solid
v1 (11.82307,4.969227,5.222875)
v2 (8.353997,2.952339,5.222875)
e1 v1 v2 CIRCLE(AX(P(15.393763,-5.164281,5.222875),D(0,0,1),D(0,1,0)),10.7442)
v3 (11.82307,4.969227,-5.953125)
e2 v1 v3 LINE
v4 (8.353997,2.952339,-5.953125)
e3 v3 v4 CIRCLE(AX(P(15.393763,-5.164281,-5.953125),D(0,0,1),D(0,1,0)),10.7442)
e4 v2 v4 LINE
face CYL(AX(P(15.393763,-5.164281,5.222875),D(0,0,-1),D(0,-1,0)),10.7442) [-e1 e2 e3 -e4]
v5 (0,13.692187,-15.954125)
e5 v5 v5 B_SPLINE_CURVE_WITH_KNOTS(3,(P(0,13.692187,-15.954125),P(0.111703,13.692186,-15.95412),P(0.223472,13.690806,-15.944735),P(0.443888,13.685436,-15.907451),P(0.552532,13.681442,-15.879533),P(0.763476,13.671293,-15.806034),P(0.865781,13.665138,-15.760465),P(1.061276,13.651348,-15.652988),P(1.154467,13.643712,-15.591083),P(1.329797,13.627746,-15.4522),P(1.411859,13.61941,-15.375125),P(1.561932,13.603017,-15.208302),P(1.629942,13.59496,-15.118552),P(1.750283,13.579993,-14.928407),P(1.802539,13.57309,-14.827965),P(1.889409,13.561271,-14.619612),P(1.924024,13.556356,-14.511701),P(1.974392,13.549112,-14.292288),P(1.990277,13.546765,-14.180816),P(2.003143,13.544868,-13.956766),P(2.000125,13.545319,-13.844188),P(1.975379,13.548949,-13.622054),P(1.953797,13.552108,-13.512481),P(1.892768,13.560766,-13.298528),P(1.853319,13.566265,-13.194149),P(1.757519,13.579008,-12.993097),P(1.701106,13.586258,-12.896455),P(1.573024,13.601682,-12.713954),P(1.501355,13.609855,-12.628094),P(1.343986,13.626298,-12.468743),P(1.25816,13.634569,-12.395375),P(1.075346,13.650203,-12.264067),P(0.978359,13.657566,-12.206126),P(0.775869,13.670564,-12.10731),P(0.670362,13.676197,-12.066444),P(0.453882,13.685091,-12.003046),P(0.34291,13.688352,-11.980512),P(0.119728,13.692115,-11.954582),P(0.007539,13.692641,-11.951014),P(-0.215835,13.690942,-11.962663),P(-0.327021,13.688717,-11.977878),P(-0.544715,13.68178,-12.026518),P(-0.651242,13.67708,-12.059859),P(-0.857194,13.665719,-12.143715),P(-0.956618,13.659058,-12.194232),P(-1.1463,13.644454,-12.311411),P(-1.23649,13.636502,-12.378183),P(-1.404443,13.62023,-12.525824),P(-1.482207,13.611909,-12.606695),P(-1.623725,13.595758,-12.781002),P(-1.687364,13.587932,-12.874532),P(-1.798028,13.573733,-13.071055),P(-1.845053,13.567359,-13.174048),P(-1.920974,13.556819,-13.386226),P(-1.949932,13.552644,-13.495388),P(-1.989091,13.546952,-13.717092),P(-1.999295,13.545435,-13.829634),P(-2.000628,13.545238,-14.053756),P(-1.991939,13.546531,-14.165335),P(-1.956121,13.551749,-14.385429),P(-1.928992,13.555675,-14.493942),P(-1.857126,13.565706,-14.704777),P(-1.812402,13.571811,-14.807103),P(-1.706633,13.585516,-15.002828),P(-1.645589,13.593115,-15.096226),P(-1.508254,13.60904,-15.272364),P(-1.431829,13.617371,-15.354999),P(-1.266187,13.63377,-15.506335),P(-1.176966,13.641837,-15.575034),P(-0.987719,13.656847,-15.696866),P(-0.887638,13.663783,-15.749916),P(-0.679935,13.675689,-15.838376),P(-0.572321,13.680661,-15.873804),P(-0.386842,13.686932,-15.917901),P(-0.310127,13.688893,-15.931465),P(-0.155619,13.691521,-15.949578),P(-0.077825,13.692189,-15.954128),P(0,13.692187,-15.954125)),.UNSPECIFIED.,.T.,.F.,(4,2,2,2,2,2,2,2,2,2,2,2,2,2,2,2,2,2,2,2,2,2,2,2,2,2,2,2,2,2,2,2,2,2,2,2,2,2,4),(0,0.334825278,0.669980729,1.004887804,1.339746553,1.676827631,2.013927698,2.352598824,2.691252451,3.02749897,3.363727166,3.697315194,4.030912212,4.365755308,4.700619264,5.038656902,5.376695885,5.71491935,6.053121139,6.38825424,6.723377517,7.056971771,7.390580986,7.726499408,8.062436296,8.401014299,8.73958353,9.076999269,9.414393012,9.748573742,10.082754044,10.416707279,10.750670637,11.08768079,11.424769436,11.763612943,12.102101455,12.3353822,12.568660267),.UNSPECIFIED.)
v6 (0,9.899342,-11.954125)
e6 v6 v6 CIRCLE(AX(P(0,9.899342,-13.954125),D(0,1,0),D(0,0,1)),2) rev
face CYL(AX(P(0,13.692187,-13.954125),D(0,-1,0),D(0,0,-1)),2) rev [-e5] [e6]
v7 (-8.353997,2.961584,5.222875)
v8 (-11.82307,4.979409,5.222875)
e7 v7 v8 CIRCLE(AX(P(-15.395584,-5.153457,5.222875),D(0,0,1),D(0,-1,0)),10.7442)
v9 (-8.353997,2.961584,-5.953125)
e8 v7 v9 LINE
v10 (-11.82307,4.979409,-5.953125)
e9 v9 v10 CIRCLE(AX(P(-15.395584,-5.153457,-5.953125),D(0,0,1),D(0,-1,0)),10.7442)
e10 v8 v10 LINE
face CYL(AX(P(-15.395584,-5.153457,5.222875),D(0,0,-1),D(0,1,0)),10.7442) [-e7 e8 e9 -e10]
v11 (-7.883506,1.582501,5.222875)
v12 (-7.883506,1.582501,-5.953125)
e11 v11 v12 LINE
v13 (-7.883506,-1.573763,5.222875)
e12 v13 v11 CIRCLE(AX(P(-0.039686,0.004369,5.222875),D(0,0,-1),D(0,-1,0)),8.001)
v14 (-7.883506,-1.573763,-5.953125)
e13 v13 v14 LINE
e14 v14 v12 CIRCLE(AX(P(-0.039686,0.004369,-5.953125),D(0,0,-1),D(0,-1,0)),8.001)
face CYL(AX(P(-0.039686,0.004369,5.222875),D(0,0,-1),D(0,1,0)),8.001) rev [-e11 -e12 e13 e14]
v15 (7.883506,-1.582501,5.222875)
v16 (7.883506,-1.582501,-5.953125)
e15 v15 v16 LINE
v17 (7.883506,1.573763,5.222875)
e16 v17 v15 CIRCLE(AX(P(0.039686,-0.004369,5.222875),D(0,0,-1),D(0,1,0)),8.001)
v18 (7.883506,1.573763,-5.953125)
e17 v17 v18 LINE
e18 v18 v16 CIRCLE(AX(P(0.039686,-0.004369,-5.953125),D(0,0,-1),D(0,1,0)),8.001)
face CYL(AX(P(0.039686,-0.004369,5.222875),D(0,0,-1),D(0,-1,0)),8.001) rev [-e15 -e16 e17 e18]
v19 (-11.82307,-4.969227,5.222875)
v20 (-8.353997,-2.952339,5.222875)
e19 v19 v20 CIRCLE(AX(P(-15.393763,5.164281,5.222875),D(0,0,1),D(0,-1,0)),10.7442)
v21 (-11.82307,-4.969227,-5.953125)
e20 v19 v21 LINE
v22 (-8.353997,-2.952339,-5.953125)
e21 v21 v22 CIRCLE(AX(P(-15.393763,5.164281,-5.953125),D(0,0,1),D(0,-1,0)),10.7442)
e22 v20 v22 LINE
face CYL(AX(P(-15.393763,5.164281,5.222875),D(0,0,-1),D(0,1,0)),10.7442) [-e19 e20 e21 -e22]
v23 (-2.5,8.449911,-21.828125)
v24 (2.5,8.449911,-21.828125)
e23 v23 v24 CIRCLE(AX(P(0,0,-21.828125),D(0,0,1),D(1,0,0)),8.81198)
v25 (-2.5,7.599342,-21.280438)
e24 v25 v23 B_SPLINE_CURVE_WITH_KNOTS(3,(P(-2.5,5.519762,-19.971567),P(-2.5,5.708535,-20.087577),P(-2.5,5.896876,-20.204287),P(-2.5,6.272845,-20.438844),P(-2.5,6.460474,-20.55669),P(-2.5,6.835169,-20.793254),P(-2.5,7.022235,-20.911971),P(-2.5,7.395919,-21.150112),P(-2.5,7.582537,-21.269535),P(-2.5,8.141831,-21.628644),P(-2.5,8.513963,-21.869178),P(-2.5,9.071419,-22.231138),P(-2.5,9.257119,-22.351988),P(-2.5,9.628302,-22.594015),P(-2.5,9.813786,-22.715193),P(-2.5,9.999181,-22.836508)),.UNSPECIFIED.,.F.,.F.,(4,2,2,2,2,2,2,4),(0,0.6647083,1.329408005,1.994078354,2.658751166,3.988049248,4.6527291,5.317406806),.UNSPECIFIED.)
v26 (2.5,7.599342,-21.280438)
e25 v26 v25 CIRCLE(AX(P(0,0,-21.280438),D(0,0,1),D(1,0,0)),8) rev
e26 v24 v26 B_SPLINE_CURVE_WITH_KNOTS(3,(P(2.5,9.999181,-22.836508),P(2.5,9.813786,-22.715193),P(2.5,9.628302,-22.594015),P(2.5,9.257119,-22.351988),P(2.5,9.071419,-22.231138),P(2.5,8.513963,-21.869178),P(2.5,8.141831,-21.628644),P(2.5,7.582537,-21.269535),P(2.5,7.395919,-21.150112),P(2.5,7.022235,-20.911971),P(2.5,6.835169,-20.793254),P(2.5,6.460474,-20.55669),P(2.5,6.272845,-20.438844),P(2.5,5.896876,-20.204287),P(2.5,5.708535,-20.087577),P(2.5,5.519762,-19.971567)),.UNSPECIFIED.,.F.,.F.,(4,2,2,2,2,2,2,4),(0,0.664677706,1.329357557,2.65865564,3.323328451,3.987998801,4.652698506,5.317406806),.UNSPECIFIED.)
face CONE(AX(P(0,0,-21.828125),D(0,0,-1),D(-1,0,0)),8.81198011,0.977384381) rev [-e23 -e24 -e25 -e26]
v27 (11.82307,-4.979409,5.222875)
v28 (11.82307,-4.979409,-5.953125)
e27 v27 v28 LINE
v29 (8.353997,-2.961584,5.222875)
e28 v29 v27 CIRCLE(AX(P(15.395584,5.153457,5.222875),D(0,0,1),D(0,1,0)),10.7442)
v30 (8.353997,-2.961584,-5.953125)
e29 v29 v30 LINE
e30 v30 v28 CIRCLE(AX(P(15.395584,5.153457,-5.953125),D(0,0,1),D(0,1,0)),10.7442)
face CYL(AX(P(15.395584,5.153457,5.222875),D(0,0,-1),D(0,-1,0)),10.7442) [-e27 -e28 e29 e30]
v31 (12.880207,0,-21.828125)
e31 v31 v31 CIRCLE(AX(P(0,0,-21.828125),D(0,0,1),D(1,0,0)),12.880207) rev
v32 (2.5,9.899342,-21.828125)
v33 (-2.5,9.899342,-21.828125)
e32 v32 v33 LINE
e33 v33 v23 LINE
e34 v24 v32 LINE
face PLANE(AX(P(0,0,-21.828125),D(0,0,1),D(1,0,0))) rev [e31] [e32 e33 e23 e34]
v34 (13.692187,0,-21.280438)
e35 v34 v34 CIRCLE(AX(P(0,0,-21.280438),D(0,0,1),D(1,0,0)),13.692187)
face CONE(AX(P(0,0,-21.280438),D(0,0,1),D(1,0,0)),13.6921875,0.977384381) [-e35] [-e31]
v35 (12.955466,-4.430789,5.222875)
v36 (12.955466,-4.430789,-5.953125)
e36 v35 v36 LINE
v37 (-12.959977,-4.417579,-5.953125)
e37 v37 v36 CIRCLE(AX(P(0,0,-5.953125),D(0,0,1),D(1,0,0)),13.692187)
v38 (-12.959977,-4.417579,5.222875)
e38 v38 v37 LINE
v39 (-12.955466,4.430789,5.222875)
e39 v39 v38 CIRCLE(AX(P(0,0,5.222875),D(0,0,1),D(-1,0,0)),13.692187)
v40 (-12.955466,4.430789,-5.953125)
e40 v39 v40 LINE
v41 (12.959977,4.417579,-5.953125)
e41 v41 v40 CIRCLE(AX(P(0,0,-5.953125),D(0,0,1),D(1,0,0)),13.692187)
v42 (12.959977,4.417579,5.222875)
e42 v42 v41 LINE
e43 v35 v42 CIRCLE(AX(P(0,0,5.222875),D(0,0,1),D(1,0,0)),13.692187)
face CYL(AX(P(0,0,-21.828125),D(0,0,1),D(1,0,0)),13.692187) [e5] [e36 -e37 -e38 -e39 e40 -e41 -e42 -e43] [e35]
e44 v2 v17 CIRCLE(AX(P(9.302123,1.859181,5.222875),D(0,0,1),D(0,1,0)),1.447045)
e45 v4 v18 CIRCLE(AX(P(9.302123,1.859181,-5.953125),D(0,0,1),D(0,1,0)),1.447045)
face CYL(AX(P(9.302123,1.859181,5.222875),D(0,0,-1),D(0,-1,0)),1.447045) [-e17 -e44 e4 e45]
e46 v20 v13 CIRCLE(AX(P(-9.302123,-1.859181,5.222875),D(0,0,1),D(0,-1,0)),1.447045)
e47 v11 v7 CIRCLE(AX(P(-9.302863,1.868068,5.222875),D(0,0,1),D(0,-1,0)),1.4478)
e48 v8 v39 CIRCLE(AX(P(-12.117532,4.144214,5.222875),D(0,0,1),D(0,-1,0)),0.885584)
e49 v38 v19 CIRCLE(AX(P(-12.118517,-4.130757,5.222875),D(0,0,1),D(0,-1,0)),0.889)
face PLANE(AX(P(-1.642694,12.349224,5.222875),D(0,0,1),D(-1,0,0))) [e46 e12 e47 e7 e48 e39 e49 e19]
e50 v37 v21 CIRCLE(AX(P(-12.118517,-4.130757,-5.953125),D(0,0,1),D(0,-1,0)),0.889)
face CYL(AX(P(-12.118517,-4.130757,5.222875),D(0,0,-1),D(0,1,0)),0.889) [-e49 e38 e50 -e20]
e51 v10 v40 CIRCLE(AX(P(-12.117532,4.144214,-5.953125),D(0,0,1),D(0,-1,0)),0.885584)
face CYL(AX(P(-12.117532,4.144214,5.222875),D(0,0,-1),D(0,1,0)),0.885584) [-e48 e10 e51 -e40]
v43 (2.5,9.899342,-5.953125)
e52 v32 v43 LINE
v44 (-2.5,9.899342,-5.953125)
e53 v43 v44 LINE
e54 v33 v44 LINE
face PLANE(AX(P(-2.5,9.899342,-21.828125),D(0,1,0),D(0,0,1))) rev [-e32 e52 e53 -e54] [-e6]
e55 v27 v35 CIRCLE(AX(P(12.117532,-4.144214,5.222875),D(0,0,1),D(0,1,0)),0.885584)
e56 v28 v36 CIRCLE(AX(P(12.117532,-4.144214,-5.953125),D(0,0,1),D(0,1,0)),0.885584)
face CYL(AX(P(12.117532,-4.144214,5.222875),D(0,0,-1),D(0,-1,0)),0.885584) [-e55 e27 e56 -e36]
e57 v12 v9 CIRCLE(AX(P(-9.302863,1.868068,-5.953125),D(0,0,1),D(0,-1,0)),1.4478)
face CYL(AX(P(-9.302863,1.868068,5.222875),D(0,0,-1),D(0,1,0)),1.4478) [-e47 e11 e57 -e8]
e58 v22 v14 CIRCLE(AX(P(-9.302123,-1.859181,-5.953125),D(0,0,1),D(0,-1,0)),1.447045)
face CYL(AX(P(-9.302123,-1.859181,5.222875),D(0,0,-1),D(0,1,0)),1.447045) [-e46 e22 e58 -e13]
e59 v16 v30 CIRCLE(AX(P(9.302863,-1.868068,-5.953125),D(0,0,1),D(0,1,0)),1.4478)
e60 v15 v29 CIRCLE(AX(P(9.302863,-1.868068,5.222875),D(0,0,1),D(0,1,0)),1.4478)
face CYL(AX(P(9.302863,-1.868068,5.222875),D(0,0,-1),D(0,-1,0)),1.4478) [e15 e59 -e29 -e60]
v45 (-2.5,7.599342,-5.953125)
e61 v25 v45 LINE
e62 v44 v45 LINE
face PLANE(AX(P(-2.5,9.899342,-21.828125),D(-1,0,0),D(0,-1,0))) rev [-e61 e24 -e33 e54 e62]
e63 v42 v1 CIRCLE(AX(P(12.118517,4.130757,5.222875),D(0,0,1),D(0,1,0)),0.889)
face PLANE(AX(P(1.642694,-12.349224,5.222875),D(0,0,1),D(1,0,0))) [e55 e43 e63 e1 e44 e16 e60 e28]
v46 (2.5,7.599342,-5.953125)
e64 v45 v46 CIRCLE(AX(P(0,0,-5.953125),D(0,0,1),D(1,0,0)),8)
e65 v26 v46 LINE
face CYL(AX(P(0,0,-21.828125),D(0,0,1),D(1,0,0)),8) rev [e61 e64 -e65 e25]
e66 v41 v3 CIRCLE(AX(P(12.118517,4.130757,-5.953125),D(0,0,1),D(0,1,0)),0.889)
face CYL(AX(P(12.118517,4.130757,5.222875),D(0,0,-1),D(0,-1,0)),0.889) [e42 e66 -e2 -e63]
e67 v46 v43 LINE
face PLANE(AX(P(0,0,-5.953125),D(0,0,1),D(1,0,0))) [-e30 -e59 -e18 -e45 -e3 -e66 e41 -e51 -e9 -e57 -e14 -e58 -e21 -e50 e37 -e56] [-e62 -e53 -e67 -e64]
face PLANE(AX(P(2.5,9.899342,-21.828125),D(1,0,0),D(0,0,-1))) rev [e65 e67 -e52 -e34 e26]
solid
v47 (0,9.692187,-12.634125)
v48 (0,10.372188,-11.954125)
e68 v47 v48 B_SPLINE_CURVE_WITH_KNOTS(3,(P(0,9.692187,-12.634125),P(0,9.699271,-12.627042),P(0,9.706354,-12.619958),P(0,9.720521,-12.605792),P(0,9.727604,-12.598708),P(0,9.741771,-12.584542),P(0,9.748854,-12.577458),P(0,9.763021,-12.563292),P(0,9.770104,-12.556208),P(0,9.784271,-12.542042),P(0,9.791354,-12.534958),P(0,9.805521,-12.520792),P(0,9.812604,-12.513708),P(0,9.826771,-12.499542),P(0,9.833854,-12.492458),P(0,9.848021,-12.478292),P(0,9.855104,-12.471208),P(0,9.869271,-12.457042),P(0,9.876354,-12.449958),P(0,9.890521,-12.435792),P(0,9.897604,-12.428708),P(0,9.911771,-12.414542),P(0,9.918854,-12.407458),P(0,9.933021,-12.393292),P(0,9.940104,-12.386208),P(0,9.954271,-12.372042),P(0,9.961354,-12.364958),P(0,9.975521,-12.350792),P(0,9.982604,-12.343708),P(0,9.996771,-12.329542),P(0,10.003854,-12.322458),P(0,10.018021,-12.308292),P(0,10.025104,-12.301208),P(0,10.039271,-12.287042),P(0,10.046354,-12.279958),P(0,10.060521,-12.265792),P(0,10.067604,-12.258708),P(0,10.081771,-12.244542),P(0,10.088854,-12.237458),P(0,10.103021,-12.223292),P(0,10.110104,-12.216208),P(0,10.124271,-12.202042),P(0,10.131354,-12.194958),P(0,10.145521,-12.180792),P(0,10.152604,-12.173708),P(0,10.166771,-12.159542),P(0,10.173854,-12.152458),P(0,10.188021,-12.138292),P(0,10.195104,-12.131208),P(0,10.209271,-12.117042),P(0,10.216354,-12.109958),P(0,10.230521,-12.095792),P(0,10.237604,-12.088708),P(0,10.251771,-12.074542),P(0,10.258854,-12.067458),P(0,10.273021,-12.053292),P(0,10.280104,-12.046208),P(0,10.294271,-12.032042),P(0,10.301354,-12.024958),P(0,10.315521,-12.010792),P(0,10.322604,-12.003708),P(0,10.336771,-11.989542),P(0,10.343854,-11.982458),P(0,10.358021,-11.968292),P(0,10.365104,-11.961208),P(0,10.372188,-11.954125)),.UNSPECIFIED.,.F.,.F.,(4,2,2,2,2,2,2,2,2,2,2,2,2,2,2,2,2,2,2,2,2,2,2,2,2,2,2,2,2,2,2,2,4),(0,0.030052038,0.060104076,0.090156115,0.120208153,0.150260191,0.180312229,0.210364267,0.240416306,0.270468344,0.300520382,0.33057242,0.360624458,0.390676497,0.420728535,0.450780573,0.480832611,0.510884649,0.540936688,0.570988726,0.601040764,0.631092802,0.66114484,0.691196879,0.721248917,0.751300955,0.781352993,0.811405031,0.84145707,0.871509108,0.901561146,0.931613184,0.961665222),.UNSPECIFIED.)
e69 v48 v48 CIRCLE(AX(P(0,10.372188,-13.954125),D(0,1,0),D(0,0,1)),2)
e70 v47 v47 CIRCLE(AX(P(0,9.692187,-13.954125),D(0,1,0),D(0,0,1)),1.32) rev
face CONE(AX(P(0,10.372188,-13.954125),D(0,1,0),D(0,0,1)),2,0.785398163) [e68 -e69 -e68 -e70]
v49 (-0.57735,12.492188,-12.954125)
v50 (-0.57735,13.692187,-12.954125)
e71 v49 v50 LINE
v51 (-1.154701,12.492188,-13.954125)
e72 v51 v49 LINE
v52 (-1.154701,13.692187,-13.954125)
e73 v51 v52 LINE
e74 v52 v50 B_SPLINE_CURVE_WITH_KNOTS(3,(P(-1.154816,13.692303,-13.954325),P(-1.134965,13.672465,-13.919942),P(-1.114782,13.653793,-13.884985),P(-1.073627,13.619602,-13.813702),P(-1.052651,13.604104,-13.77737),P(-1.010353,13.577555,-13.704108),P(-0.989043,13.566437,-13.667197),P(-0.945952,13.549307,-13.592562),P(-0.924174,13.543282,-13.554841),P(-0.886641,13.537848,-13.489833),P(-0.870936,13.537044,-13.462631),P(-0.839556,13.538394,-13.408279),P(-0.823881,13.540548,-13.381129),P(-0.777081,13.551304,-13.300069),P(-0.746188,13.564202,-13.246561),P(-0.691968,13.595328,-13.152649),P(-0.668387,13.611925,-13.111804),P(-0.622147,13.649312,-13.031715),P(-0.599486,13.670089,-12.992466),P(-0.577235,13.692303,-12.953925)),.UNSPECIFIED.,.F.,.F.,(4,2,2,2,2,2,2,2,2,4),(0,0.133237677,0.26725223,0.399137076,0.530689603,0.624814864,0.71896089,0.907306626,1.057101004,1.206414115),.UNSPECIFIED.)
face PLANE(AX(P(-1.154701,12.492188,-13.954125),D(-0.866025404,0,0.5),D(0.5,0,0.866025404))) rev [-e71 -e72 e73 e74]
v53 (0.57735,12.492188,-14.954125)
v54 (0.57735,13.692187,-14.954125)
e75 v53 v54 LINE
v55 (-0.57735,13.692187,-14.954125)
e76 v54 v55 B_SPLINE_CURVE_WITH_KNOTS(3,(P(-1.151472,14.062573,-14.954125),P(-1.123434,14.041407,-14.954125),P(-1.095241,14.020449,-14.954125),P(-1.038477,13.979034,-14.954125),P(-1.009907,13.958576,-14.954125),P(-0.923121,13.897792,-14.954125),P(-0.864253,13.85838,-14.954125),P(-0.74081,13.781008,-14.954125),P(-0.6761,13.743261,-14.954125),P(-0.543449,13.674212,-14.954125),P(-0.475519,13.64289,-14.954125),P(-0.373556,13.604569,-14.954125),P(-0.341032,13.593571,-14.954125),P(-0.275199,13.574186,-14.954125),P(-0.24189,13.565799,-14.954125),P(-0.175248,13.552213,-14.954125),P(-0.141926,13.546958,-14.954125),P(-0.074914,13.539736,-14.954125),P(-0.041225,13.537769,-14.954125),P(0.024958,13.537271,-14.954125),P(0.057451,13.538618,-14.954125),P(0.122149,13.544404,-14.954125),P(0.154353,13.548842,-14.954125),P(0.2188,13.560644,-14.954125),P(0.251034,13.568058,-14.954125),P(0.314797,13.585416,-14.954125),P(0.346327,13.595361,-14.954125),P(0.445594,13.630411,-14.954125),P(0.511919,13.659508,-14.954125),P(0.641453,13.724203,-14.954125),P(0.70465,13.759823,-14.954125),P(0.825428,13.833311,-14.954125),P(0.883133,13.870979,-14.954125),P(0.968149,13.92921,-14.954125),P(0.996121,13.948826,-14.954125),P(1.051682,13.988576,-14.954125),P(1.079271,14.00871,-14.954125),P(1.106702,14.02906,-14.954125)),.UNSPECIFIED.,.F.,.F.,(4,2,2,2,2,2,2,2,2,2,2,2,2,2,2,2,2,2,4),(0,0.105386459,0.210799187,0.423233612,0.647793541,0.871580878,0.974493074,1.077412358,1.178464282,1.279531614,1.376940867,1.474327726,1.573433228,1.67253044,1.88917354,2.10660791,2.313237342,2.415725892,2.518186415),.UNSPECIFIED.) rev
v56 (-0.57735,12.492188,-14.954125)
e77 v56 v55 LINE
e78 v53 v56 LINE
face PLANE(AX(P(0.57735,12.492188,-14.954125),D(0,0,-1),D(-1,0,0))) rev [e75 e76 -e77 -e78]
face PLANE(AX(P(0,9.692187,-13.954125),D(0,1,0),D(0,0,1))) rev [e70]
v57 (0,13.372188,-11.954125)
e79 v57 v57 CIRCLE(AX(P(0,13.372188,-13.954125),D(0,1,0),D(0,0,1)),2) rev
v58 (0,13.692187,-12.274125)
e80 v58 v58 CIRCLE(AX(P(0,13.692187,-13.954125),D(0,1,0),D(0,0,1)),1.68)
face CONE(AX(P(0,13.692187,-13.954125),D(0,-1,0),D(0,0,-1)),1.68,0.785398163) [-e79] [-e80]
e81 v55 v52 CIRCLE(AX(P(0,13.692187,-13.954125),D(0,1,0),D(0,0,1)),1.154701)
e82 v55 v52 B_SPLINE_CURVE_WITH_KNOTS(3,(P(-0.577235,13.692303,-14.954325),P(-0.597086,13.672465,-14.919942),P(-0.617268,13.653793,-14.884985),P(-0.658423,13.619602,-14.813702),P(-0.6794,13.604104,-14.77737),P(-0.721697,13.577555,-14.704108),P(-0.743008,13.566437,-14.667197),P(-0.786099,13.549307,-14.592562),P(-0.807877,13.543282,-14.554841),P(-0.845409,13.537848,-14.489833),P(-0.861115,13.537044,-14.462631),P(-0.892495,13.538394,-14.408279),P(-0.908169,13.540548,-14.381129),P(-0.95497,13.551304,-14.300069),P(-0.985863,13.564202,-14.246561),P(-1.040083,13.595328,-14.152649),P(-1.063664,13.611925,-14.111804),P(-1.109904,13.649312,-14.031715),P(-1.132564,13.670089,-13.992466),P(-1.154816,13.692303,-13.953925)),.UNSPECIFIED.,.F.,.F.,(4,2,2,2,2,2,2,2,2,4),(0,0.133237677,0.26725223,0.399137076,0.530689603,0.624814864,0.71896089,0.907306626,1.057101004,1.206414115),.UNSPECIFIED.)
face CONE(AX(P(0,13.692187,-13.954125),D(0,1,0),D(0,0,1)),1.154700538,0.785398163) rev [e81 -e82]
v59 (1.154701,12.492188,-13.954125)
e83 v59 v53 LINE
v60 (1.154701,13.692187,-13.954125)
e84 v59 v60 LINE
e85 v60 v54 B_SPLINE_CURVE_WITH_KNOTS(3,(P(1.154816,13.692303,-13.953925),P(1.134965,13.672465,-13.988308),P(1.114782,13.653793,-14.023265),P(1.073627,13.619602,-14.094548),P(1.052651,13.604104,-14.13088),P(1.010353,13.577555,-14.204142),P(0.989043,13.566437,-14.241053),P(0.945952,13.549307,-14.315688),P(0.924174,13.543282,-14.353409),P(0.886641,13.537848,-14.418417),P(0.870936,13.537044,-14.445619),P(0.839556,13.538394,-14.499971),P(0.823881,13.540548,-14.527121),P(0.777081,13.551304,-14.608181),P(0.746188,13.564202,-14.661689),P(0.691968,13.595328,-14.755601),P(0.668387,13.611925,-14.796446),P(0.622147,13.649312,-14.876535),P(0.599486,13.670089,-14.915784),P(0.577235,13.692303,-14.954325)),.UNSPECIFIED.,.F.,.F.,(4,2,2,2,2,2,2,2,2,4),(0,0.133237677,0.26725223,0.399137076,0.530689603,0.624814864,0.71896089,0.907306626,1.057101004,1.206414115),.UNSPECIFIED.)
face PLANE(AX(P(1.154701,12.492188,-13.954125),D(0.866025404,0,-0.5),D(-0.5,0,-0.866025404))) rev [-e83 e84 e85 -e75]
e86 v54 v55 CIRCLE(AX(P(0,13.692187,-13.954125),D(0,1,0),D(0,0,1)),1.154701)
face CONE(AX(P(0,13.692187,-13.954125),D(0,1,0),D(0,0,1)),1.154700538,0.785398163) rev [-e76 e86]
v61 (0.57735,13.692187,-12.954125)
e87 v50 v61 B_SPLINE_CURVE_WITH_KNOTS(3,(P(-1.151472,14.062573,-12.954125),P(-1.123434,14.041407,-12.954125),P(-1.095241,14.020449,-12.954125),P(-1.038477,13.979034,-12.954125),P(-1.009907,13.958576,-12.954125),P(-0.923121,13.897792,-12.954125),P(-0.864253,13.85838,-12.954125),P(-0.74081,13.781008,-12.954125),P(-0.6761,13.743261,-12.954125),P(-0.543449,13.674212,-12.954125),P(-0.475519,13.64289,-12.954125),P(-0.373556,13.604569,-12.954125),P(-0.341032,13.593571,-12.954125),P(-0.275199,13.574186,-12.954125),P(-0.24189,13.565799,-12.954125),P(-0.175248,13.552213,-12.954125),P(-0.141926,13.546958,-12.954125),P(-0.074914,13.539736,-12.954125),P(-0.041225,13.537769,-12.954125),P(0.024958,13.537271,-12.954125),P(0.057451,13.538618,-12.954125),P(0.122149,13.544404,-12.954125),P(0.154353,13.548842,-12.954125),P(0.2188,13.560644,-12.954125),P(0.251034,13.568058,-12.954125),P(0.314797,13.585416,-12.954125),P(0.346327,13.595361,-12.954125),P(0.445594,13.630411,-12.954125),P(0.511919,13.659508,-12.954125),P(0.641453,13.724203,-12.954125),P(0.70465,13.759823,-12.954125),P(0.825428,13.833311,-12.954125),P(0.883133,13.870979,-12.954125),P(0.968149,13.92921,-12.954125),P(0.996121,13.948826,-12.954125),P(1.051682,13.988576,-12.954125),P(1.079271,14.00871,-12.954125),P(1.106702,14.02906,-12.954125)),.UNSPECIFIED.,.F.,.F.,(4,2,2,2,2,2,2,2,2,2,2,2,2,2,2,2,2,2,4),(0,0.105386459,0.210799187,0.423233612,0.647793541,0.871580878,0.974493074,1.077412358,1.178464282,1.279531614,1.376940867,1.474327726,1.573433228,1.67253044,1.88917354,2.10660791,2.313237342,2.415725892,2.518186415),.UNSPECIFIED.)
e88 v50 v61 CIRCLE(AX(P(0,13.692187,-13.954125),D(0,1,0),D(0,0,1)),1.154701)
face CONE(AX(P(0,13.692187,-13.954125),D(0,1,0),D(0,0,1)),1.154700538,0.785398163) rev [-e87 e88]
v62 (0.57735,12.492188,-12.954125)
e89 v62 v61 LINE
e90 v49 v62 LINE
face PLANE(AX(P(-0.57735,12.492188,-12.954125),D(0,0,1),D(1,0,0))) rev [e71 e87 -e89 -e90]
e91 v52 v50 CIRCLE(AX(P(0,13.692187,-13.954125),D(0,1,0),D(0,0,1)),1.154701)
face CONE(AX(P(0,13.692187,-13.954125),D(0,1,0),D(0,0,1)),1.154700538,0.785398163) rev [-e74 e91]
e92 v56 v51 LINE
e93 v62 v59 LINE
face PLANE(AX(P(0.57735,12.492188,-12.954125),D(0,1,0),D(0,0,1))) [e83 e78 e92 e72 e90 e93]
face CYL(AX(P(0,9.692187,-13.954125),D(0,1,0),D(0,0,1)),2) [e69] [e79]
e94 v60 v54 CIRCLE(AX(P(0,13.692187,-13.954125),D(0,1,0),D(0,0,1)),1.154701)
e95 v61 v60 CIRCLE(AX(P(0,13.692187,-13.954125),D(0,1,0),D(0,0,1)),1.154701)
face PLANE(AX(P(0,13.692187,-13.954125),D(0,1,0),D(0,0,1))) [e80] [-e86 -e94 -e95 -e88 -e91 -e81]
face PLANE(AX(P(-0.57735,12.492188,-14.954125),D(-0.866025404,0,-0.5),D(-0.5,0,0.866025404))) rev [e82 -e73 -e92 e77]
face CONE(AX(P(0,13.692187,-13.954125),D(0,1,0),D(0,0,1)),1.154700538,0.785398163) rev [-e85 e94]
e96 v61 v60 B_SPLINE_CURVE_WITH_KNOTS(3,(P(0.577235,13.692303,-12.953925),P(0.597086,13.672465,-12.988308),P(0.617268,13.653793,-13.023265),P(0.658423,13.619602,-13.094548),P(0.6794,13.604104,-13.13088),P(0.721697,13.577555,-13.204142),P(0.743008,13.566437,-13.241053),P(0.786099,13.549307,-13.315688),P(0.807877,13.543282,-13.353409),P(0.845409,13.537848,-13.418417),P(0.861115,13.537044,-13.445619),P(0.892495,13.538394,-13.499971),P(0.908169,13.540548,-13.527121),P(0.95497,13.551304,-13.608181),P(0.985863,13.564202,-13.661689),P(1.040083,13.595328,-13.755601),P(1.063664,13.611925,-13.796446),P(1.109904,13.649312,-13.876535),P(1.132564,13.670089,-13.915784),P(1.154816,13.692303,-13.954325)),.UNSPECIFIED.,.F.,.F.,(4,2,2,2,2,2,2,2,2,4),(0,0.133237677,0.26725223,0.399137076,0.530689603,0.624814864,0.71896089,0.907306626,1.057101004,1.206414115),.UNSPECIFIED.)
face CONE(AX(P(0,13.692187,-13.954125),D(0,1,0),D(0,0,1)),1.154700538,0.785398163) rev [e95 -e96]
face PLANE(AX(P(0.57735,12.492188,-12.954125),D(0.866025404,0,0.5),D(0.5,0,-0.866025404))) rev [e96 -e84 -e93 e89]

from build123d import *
from OCP.BRepFilletAPI import BRepFilletAPI_MakeChamfer

# Parameters (mm, degrees)
BOSS_EXTRUDE1_START     = -5.953125
SKETCH1_R               = 13.6921875
BOSS_EXTRUDE1_DEPTH     = 15.875
BOSS_EXTRUDE5_START     = 11.176
BOSS_EXTRUDE5_DEPTH     = 11.176
MOVE_START              = -5.953125
MOVE_FACE1_DEPTH        = 11.176
MOVE_FACE1_2_DEPTH      = 11.176
CIRPATTERN3_START       = -5.953125
CIRPATTERN3_DEPTH       = 11.176
CUT_EXTRUDE5_DEPTH      = 30.179085628
CUT_EXTRUDE5_DEPTH_BACK = 30.179085628
SKETCH15_R              = 8
CHAMFER1_SIZE           = 0.5476875
CHAMFER1_SIZE2          = 0.81198011
CUT_EXTRUDE1_DEPTH      = 30.179085628
CUT_EXTRUDE1_DEPTH_BACK = 30.179085628
SKETCH5_R               = 2
CUT_EXTRUDE2_DEPTH      = 30.179085628
SKETCH6_R               = 2
BOSS_EXTRUDE3_DEPTH     = 4
CUT_EXTRUDE3_DEPTH      = 1.2
CHAMFER3_SIZE           = 0.32
CHAMFER4_SIZE           = 0.68


# Read off the part's stored shape, not the designer's step: Move Face1, CirPattern3
with BuildPart() as part:
    # Sketch1 → Boss-Extrude1 (new body)
    with BuildSketch(Plane.XY.offset(BOSS_EXTRUDE1_START)):
        Circle(SKETCH1_R)
    extrude(amount=-BOSS_EXTRUDE1_DEPTH)

    # Sketch11 → Boss-Extrude5 (add)
    with BuildSketch(Plane.XY.offset(-5.953125).offset(BOSS_EXTRUDE5_START)):
        with BuildLine():
            ThreePointArc((-1.582501, -7.883505579), (-0.004369034, -8.040686324), (1.573762932, -7.883505579))
            ThreePointArc((1.573762932, -7.883505579), (2.326569083, -7.932638836), (2.952339417, -8.353996958))
            ThreePointArc((2.952339417, -8.353996958), (4.124174772, -9.993538922), (4.969226713, -11.823069782))
            ThreePointArc((4.969226713, -11.823069782), (4.930575443, -12.50660364), (4.417578974, -12.959976641))
            ThreePointArc((4.417578974, -12.959976641), (-0.006979455, -13.692185721), (-4.430789112, -12.955466274))
            ThreePointArc((-4.430789112, -12.955466274), (-4.941191352, -12.503649266), (-4.979409431, -11.823069782))
            ThreePointArc((-4.979409431, -11.823069782), (-4.13390788, -9.993483356), (-2.961583815, -8.353996958))
            ThreePointArc((-2.961583815, -8.353996958), (-2.335546152, -7.932611995), (-1.582501, -7.883505579))
        make_face()
    extrude(amount=-BOSS_EXTRUDE5_DEPTH)

    # Move Face1 outline → Move Face1 (cut)
    with BuildSketch(Plane.XY.offset(MOVE_START)):
        with BuildLine():
            ThreePointArc((-4.430789112, -12.955466274), (-0.006979455, -13.692185721), (4.417578974, -12.959976641))
            ThreePointArc((4.417578974, -12.959976641), (4.930575443, -12.50660364), (4.969226713, -11.823069782))
            ThreePointArc((4.969226713, -11.823069782), (4.124174772, -9.993538922), (2.952339417, -8.353996958))
            ThreePointArc((2.952339417, -8.353996958), (2.326569083, -7.932638836), (1.573762932, -7.883505579))
            ThreePointArc((1.573762932, -7.883505579), (-0.004369034, -8.040686324), (-1.582501, -7.883505579))
            ThreePointArc((-1.582501, -7.883505579), (-2.335546152, -7.932611995), (-2.961583815, -8.353996958))
            ThreePointArc((-2.961583815, -8.353996958), (-4.13390788, -9.993483356), (-4.979409431, -11.823069782))
            ThreePointArc((-4.979409431, -11.823069782), (-4.941191352, -12.503649266), (-4.430789112, -12.955466274))
        make_face()
    extrude(amount=MOVE_FACE1_DEPTH, mode=Mode.SUBTRACT)

    # Move Face1 2 outline → Move Face1 2 (add)
    with BuildSketch(Plane.XY.offset(MOVE_START)):
        with BuildLine():
            ThreePointArc((7.883505579, -1.582501), (7.932611995, -2.335546152), (8.353996958, -2.961583815))
            ThreePointArc((8.353996958, -2.961583815), (9.993483356, -4.13390788), (11.823069782, -4.979409431))
            ThreePointArc((11.823069782, -4.979409431), (12.503649266, -4.941191352), (12.955466274, -4.430789112))
            ThreePointArc((12.955466274, -4.430789112), (13.692185721, -0.006979455), (12.959976641, 4.417578974))
            ThreePointArc((12.959976641, 4.417578974), (12.50660364, 4.930575443), (11.823069782, 4.969226713))
            ThreePointArc((11.823069782, 4.969226713), (9.993538922, 4.124174772), (8.353996958, 2.952339417))
            ThreePointArc((8.353996958, 2.952339417), (7.932638836, 2.326569083), (7.883505579, 1.573762932))
            ThreePointArc((7.883505579, 1.573762932), (8.040686324, -0.004369034), (7.883505579, -1.582501))
        make_face()
    extrude(amount=MOVE_FACE1_2_DEPTH)

    # CirPattern3 outline → CirPattern3 (add)
    with BuildSketch(Plane.XY.offset(CIRPATTERN3_START)):
        with BuildLine():
            ThreePointArc((-7.883505579, 1.582501), (-7.932611995, 2.335546152), (-8.353996958, 2.961583815))
            ThreePointArc((-8.353996958, 2.961583815), (-9.993483356, 4.13390788), (-11.823069782, 4.979409431))
            ThreePointArc((-11.823069782, 4.979409431), (-12.503649266, 4.941191352), (-12.955466274, 4.430789112))
            ThreePointArc((-12.955466274, 4.430789112), (-13.692185721, 0.006979455), (-12.959976641, -4.417578974))
            ThreePointArc((-12.959976641, -4.417578974), (-12.50660364, -4.930575443), (-11.823069782, -4.969226713))
            ThreePointArc((-11.823069782, -4.969226713), (-9.993538922, -4.124174772), (-8.353996958, -2.952339417))
            ThreePointArc((-8.353996958, -2.952339417), (-7.932638836, -2.326569083), (-7.883505579, -1.573762932))
            ThreePointArc((-7.883505579, -1.573762932), (-8.040686324, 0.004369034), (-7.883505579, 1.582501))
        make_face()
    extrude(amount=CIRPATTERN3_DEPTH)

    # Sketch15 → Cut-Extrude5 (cut, two sides: drawn at the far end of the back side and taken through both)
    with BuildSketch(Plane.XY.offset(-CUT_EXTRUDE5_DEPTH_BACK)):
        Circle(SKETCH15_R)
    extrude(amount=CUT_EXTRUDE5_DEPTH + CUT_EXTRUDE5_DEPTH_BACK, mode=Mode.SUBTRACT)

    # Chamfer1: one chamfer whose edges measure the first distance from different faces: ONE call of the kernel's chamfer builder (chamfer() names one face for all edges)
    chamfer1_edges_1 = [part.edges().sort_by_distance(p)[0] for p in [
        (-13.6921875, 0, -21.828125),
    ]]
    chamfer1_side_1 = [part.faces().sort_by_distance(p)[0] for p in [
        (-13.6921875, 0, -13.890625),
    ]]
    chamfer1_edges_2 = [part.edges().sort_by_distance(p)[0] for p in [
        (-8, 0, -21.828125),
    ]]
    chamfer1_side_2 = [part.faces().sort_by_distance(p)[0] for p in [
        (-8, 0, -13.890625),
    ]]
    chamfer1 = BRepFilletAPI_MakeChamfer(part.part.solid().wrapped)
    for e in chamfer1_edges_1:
        chamfer1.Add(CHAMFER1_SIZE, CHAMFER1_SIZE2, e.wrapped, chamfer1_side_1[0].wrapped)  # the first distance lies on this face
    for e in chamfer1_edges_2:
        chamfer1.Add(CHAMFER1_SIZE, CHAMFER1_SIZE2, e.wrapped, chamfer1_side_2[0].wrapped)  # the first distance lies on this face
    add(Compound.cast(chamfer1.Shape()), mode=Mode.REPLACE)

    # Sketch4 → Cut-Extrude1 (cut, two sides: drawn at the far end of the back side and taken through both)
    with BuildSketch(Plane.XY.offset(-CUT_EXTRUDE1_DEPTH_BACK)):
        with BuildLine():
            Line((-2.5, 9.899342077), (2.5, 9.899342077))
            Line((2.5, 9.899342077), (2.5, 7.599342077))
            ThreePointArc((2.5, 7.599342077), (0, 8), (-2.5, 7.599342077))
            Line((-2.5, 7.599342077), (-2.5, 9.899342077))
        make_face()
    extrude(amount=CUT_EXTRUDE1_DEPTH + CUT_EXTRUDE1_DEPTH_BACK, mode=Mode.SUBTRACT)

    # Sketch5 → Cut-Extrude2 (cut, through all)
    with BuildSketch(Plane(origin=(0, 0, 0), x_dir=(1, 0, 0), z_dir=(0, 1, 0))):
        with Locations(Location((0, 13.954125, 0), (0, 0, 90))):
            Circle(SKETCH5_R)
    extrude(amount=CUT_EXTRUDE2_DEPTH, mode=Mode.SUBTRACT)


with BuildPart() as body_2:
    # Sketch6 → Boss-Extrude3 (new body)
    with BuildSketch(Plane(origin=(0, 13.6921875, 0), x_dir=(-1, 0, 0), z_dir=(0, 1, 0))):
        with Locations(Location((0, -13.954125, 0), (0, 0, 90))):
            Circle(SKETCH6_R)
    extrude(amount=-BOSS_EXTRUDE3_DEPTH)

    # Sketch8 → Cut-Extrude3 (cut)
    with BuildSketch(Plane(origin=(0, 13.6921875, 0), x_dir=(1, 0, 0), z_dir=(0, 1, 0))):
        Polygon((0.577350269, 12.954125), (1.154700538, 13.954125), (0.577350269, 14.954125), (-0.577350269, 14.954125), (-1.154700538, 13.954125), (-0.577350269, 12.954125), align=None)
    extrude(amount=-CUT_EXTRUDE3_DEPTH, mode=Mode.SUBTRACT)

    # Cut-Extrude4 cone 1 section (through the dimple's axis) → Cut-Extrude4 (revolve, cut)
    with BuildSketch(Plane(origin=(0, 13.6921875, -13.954125), x_dir=(0, 0, 1), z_dir=(1, 0, 0))):
        Polygon((0, 0), (1.154700538, 0), (0, 1.154700538), align=None)
    revolve(axis=Axis((0, 13.6921875, -13.954125), (0, -1, 0)), mode=Mode.SUBTRACT)

    # Chamfer3
    chamfer3_edges = [body_2.edges().sort_by_distance(p)[0] for p in [
        (0, 13.6921875, -15.954125),
    ]]
    chamfer(chamfer3_edges, length=CHAMFER3_SIZE)

    # Chamfer4
    chamfer4_edges = [body_2.edges().sort_by_distance(p)[0] for p in [
        (0, 9.6921875, -15.954125),
    ]]
    chamfer(chamfer4_edges, length=CHAMFER4_SIZE)


solid = Compound([part.part, body_2.part])
